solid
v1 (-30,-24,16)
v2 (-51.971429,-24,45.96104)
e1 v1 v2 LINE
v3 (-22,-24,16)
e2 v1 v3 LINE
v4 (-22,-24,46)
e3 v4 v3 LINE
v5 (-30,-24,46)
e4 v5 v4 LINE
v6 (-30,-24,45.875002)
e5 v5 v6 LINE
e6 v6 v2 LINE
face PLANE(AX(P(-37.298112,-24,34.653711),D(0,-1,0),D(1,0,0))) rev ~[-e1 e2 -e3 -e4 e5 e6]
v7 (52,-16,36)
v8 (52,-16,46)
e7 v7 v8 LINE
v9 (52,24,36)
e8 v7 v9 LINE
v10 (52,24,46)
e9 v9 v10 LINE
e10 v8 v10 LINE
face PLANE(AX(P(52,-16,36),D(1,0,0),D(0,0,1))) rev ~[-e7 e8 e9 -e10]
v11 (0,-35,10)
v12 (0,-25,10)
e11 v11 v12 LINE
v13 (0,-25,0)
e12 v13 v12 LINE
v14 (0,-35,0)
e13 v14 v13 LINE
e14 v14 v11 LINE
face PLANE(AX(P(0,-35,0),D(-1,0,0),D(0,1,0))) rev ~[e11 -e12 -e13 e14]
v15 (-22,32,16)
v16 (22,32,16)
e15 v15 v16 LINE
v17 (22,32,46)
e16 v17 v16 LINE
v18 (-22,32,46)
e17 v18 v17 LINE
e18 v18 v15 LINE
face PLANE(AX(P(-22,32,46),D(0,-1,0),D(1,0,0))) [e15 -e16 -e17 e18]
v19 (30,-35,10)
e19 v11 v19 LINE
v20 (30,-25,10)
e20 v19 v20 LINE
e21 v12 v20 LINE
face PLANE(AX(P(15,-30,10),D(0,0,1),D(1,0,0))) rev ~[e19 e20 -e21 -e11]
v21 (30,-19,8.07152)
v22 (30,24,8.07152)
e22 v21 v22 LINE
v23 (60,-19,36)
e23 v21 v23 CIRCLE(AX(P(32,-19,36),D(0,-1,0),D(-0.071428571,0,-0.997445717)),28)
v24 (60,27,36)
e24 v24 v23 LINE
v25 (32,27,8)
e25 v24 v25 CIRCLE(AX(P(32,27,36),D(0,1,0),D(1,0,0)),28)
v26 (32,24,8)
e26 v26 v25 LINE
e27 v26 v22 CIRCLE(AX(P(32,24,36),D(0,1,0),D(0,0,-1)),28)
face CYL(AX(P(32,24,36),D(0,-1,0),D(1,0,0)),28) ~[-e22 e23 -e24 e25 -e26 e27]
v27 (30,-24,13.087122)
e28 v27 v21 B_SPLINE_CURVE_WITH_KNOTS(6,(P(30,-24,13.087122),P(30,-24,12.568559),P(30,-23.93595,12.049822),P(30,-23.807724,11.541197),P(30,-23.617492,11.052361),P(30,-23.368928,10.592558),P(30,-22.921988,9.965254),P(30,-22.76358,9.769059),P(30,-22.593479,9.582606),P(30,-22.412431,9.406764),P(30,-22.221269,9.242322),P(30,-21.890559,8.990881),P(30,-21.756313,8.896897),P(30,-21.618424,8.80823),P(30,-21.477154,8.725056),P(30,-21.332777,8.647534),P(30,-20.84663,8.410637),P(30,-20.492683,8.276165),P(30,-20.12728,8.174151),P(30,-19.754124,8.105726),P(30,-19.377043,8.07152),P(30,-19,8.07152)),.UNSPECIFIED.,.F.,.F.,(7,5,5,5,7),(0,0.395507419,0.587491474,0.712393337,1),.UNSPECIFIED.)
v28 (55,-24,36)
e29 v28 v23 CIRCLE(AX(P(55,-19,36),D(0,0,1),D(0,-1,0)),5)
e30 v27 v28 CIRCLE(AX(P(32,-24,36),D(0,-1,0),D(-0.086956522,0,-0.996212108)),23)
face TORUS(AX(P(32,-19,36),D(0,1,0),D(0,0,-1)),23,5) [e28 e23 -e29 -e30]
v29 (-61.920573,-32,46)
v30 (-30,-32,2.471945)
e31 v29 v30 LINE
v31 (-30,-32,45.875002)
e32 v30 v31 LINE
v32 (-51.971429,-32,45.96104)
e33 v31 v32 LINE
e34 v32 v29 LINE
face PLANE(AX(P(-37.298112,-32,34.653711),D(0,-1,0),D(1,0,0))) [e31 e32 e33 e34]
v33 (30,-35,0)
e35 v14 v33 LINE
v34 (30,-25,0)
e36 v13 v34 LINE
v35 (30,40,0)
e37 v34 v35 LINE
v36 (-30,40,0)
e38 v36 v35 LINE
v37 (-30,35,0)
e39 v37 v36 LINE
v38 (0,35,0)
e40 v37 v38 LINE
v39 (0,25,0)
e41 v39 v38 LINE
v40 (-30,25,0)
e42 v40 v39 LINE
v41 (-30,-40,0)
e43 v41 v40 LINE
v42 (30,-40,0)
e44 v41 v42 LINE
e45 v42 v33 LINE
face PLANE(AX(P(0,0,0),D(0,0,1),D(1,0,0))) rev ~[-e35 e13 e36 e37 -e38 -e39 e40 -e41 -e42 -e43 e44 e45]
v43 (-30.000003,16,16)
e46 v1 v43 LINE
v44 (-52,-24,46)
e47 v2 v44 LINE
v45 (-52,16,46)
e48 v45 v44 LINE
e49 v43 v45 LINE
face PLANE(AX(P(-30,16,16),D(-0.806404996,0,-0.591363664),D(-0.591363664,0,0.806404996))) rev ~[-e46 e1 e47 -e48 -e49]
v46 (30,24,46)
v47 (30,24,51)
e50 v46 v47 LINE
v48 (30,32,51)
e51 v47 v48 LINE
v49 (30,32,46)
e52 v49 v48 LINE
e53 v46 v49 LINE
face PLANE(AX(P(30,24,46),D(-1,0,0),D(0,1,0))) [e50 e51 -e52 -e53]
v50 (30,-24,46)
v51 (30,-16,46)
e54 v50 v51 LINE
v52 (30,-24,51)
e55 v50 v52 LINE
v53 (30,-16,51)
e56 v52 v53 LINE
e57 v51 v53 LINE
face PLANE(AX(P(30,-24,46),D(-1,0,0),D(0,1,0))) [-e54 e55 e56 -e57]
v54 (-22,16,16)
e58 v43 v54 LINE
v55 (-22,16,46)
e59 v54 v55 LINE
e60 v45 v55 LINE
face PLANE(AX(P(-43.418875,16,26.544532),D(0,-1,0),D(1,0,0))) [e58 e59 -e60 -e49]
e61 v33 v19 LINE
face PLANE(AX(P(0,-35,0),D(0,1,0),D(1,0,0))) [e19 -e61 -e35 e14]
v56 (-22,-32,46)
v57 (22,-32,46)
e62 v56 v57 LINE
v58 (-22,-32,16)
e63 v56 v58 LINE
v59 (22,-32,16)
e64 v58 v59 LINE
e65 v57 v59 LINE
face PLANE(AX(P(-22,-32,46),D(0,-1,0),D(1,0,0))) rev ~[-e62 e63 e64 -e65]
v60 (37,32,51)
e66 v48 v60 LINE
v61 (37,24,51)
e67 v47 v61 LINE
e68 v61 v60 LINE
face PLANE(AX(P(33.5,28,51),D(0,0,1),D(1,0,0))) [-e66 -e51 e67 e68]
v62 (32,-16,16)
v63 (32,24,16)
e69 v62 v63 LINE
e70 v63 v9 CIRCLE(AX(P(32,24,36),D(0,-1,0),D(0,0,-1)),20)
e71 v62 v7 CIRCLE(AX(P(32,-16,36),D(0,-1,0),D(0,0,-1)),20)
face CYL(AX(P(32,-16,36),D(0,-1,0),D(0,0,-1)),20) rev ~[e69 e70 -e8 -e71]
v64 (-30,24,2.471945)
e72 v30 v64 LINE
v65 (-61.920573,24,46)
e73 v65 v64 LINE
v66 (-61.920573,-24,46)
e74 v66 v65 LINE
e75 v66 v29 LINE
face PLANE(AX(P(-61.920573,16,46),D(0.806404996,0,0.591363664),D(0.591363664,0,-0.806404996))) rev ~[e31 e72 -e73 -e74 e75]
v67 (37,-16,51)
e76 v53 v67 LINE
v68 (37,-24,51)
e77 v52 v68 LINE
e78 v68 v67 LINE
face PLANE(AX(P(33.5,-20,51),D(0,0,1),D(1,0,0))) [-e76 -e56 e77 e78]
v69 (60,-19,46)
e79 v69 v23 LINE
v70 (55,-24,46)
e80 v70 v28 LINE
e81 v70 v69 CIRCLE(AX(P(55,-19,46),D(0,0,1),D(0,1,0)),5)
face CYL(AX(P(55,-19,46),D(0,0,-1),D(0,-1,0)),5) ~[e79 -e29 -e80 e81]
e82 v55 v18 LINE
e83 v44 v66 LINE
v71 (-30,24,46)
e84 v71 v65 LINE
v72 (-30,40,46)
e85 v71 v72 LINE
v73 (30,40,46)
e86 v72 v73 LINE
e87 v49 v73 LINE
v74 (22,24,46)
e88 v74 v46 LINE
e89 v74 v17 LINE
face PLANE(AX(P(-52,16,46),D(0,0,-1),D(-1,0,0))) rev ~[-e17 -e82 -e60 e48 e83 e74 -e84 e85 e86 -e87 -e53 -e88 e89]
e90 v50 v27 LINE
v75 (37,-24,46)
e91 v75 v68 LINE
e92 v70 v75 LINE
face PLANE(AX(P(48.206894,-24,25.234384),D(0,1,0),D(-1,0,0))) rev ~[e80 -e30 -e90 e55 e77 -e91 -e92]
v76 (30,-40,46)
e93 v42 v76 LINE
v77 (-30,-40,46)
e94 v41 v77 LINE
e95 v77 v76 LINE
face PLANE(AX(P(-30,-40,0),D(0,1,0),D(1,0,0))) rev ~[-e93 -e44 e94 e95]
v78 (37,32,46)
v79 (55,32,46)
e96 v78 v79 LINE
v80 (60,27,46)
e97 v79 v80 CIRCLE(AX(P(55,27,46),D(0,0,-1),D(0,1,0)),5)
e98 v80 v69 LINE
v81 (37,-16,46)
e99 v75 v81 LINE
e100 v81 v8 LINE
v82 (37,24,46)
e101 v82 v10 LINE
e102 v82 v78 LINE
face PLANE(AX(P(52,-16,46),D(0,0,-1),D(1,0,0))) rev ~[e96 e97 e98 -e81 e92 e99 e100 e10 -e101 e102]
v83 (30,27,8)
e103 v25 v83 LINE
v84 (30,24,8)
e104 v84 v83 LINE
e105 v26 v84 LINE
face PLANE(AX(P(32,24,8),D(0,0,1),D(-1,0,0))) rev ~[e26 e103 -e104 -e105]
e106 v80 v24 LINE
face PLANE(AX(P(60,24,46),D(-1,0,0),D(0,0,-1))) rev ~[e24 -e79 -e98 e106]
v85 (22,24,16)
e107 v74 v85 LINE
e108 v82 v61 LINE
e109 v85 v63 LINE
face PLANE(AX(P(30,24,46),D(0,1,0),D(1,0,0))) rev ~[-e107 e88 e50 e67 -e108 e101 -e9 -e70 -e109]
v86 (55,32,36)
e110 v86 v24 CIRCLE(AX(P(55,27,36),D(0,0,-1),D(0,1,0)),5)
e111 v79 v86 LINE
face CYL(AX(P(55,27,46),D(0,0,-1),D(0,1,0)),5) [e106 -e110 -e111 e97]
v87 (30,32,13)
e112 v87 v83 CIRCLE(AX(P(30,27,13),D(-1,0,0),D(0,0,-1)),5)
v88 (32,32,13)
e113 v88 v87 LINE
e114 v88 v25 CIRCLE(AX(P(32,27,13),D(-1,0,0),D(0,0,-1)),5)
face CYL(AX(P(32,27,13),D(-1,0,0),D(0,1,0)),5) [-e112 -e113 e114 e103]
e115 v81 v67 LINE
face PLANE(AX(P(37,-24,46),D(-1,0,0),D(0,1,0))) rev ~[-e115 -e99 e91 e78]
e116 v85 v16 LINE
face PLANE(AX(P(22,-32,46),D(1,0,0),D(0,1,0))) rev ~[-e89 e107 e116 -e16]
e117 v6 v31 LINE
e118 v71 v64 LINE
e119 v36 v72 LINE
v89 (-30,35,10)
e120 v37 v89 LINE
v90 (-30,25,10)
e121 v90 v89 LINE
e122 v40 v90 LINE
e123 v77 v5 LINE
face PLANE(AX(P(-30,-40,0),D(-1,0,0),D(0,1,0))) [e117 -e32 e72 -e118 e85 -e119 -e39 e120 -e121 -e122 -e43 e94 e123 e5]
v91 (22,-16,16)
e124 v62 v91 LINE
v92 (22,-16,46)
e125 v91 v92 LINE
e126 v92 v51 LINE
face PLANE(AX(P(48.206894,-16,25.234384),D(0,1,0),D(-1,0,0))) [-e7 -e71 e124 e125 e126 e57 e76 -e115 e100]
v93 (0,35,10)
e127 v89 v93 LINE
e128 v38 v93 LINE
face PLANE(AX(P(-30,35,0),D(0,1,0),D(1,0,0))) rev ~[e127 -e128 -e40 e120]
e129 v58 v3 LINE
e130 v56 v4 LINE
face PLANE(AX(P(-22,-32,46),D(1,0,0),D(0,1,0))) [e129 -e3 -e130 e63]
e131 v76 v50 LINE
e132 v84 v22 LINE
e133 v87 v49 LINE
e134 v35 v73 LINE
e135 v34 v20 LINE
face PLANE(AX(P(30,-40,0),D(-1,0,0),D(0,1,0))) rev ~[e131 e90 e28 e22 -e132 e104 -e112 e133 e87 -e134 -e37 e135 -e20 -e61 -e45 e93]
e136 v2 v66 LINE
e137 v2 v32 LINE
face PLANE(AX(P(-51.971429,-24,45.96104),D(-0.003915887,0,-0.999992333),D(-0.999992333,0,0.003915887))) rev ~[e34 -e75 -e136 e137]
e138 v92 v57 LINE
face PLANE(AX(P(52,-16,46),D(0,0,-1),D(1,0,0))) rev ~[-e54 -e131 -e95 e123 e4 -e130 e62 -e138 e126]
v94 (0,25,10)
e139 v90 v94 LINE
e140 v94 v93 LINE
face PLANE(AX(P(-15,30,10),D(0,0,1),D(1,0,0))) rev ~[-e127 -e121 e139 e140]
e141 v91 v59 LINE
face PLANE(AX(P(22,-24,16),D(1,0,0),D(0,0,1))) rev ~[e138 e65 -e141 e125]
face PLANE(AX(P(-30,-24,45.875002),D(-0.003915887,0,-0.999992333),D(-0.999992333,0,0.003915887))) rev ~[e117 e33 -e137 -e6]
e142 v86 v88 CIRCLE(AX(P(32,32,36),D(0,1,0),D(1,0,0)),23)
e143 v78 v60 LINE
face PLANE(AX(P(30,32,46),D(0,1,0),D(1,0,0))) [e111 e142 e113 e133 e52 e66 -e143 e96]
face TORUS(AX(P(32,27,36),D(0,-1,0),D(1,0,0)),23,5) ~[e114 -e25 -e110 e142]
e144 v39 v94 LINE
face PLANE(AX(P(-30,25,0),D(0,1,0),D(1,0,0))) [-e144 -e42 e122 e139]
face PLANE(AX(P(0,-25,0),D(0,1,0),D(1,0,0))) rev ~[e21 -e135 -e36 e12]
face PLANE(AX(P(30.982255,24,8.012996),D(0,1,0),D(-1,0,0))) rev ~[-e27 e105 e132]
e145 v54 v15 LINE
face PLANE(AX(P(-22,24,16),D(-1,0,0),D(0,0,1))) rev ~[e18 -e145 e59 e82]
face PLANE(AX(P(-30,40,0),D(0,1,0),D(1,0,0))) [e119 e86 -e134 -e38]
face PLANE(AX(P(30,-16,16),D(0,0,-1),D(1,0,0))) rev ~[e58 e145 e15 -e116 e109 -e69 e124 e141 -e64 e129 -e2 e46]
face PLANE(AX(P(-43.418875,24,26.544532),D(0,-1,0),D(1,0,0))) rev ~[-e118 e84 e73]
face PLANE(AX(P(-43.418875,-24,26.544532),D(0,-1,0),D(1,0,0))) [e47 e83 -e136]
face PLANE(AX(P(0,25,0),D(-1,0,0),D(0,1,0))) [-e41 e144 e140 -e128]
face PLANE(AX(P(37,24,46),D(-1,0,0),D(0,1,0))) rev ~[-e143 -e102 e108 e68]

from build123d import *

# Parameters (mm, degrees)
F0_W      = 60
F0_H      = 80
F2_DEPTH  = 46
F1_W      = 30
F1_H      = 10
F3_DEPTH  = 10
F4_W      = 44
F4_H      = 64
F5_DEPTH  = 30
F6_W      = 8
F6_H      = 48
F7_DEPTH  = 30
F8_W      = 22
F8_H      = 30
F8_W_2    = 8
F9_DEPTH  = 8
F10_R     = 20
F12_DEPTH = 8
F14_DEPTH = 40
F15_R     = 5
F17_DEPTH = 8
F18_R     = 5
F19_W     = 7
F19_H     = 8
F20_DEPTH = 5
F21_W     = 22
F21_H     = 30
F21_W_2   = 8
F22_DEPTH = 8
F23_SIZE2 = 29.99999
F23_SIZE  = 21.99999
F25_DEPTH = 8
F27_DEPTH = 40
F29_DEPTH = 8


# Not quite as in the source:
# - a fillet or chamfer is up to 0.001 mm smaller than in the source, because OpenCascade refuses the exact size


with BuildPart() as f2:
    # F0 (on Top) → F2 (new body)
    with BuildSketch(Plane.XY):
        Rectangle(F0_W, F0_H)
    extrude(amount=F2_DEPTH)

    # F1 (on face) → F3 (cut)
    with BuildSketch(Plane.XY):
        with Locations((-15, 30)):
            Rectangle(F1_W, F1_H)
        with Locations((15, -30)):
            Rectangle(F1_W, F1_H)
    extrude(amount=F3_DEPTH, mode=Mode.SUBTRACT)

    # F4 (on face) → F5 (cut)
    with BuildSketch(Plane.XY.offset(46)):
        Rectangle(F4_W, F4_H)
    extrude(amount=-F5_DEPTH, mode=Mode.SUBTRACT)

    # F6 (on face) → F7 (cut, through all)
    with BuildSketch(Plane.XY.offset(46)):
        with Locations((-26, 0)):
            Rectangle(F6_W, F6_H)
        with Locations((26, 0)):
            Rectangle(F6_W, F6_H)
    extrude(amount=-F7_DEPTH, mode=Mode.SUBTRACT)

    # F8 (on face) → F9 (join)
    with BuildSketch(Plane(origin=(0, -24, 0), x_dir=(-1, 0, 0), z_dir=(0, 1, 0))):
        with Locations((-41, 31)):
            Rectangle(F8_W, F8_H)
        with Locations((-26, 31)):
            Rectangle(F8_W_2, F8_H)
    extrude(amount=F9_DEPTH)

    # F10
    f10_edges = [f2.edges().sort_by_distance(p)[0] for p in [
        (52, -20, 16),
    ]]
    fillet(f10_edges, radius=F10_R)

    # F11 (on face) → F12 (join, through all)
    with BuildSketch(Plane(origin=(0, -16, 0), x_dir=(-1, 0, 0), z_dir=(0, 1, 0))):
        with BuildLine():
            ThreePointArc((-58.1533936612, 46), (-59.5344785906, 41.08453427), (-60, 36))
            ThreePointArc((-60, 36), (-51.7989898732, 16.2010101268), (-32, 8))
            Line((-32, 8), (-32, 16))
            ThreePointArc((-32, 16), (-46.1421356237, 21.8578643763), (-52, 36))
            Line((-52, 36), (-52, 46))
            Line((-52, 46), (-58.1533936612, 46))
        make_face()
        with BuildLine():
            Line((-60, 46), (-60, 36))
            ThreePointArc((-60, 36), (-59.5344785906, 41.08453427), (-58.1533936612, 46))
            Line((-58.1533936612, 46), (-60, 46))
        make_face()
        with BuildLine():
            Line((-32, 16), (-32, 8))
            ThreePointArc((-32, 8), (-30.999360817, 8.0178856906), (-30, 8.0715199125))
            Line((-30, 8.0715199125), (-30, 16))
            Line((-30, 16), (-32, 16))
        make_face()
    extrude(amount=-F12_DEPTH)

    # F13 (on face) → F14 (join, through all)
    with BuildSketch(Plane(origin=(0, -16, 0), x_dir=(-1, 0, 0), z_dir=(0, 1, 0))):
        with BuildLine():
            ThreePointArc((-58.1533936612, 46), (-59.5344785906, 41.08453427), (-60, 36))
            Line((-60, 36), (-52, 36))
            Line((-52, 36), (-52, 46))
            Line((-52, 46), (-58.1533936612, 46))
        make_face()
        with BuildLine():
            Line((-60, 46), (-60, 36))
            ThreePointArc((-60, 36), (-59.5344785906, 41.08453427), (-58.1533936612, 46))
            Line((-58.1533936612, 46), (-60, 46))
        make_face()
        with BuildLine():
            Line((-52, 36), (-60, 36))
            ThreePointArc((-60, 36), (-51.7989898732, 16.2010101268), (-32, 8))
            Line((-32, 8), (-32, 16))
            ThreePointArc((-32, 16), (-46.1421356237, 21.8578643763), (-52, 36))
        make_face()
        with BuildLine():
            Line((-32, 16), (-32, 8))
            ThreePointArc((-32, 8), (-30.999360817, 8.0178856906), (-30, 8.0715199125))
            Line((-30, 8.0715199125), (-30, 16))
            Line((-30, 16), (-32, 16))
        make_face()
    extrude(amount=F14_DEPTH)

    # F15
    f15_edges = [f2.edges().sort_by_distance(p)[0] for p in [
        (51.078784, -24, 15.506098),
    ]]
    fillet(f15_edges, radius=F15_R)

    # F16 (on face) → F17 (join)
    with BuildSketch(Plane(origin=(0, 24, 0), x_dir=(-1, 0, 0), z_dir=(0, 1, 0))):
        with BuildLine():
            ThreePointArc((-30, 8.0715199125), (-30.999360817, 8.0178856906), (-32, 8))
            Line((-32, 8), (-30, 8))
            Line((-30, 8), (-30, 8.0715199125))
        make_face()
        with BuildLine():
            Line((-30, 16), (-32, 16))
            Line((-32, 16), (-32, 8))
            ThreePointArc((-32, 8), (-30.999360817, 8.0178856906), (-30, 8.0715199125))
            Line((-30, 8.0715199125), (-30, 16))
        make_face()
        with BuildLine():
            ThreePointArc((-32, 16), (-46.1421356237, 21.8578643763), (-52, 36))
            Line((-52, 36), (-60, 36))
            ThreePointArc((-60, 36), (-51.7989898732, 16.2010101268), (-32, 8))
            Line((-32, 8), (-32, 16))
        make_face()
        with BuildLine():
            Line((-60, 46), (-60, 36))
            ThreePointArc((-60, 36), (-59.5344785906, 41.08453427), (-58.1533936612, 46))
            Line((-58.1533936612, 46), (-60, 46))
        make_face()
        with BuildLine():
            Line((-60, 36), (-52, 36))
            Line((-52, 36), (-52, 46))
            Line((-52, 46), (-58.1533936612, 46))
            ThreePointArc((-58.1533936612, 46), (-59.5344785906, 41.08453427), (-60, 36))
        make_face()
        with BuildLine():
            ThreePointArc((-30, 16.1002512579), (-30.9987444988, 16.0250785378), (-32, 16))
            Line((-32, 16), (-30, 16))
            Line((-30, 16), (-30, 16.1002512579))
        make_face()
        with BuildLine():
            ThreePointArc((-49.3205080757, 46), (-51.3185165258, 41.1763809021), (-52, 36))
            ThreePointArc((-52, 36), (-46.1421356237, 21.8578643763), (-32, 16))
            ThreePointArc((-32, 16), (-30.9987444988, 16.0250785378), (-30, 16.1002512579))
            Line((-30, 16.1002512579), (-30, 46))
            Line((-30, 46), (-49.3205080757, 46))
        make_face()
        with BuildLine():
            Line((-52, 46), (-52, 36))
            ThreePointArc((-52, 36), (-51.3185165258, 41.1763809021), (-49.3205080757, 46))
            Line((-49.3205080757, 46), (-52, 46))
        make_face()
    extrude(amount=F17_DEPTH)

    # F18
    f18_edges = [f2.edges().sort_by_distance(p)[0] for p in [
        (51.79899, 32, 16.20101),
    ]]
    fillet(f18_edges, radius=F18_R)

    # F19 (on face) → F20 (join)
    with BuildSketch(Plane.XY.offset(46)):
        with Locations((33.5, 28)):
            Rectangle(F19_W, F19_H)
        with Locations((33.5, -20)):
            Rectangle(F19_W, F19_H)
    extrude(amount=F20_DEPTH)

    # F21 (on face) → F22 (join)
    with BuildSketch(Plane.XZ.offset(-24)):
        with Locations((-41, 31)):
            Rectangle(F21_W, F21_H)
        with Locations((-26, 31)):
            Rectangle(F21_W_2, F21_H)
    extrude(amount=F22_DEPTH)

    # F23 (size 22 and 30 in the source; OpenCascade refuses exactly that, so slightly less here)
    f23_edges = [f2.edges().sort_by_distance(p)[0] for p in [
        (-52, 20, 16),
    ]]
    f23_side = f2.faces().sort_by_distance((-41, 20, 16))[0]
    chamfer(f23_edges, length=F23_SIZE, length2=F23_SIZE2, reference=f23_side)

    # F24 (on face) → F25 (join)
    with BuildSketch(Plane.XZ.offset(-16)):
        Polygon((-30, 16), (-52, 46), (-61.9205734601, 46), (-30, 2.4719452816), align=None)
    extrude(amount=-F25_DEPTH)

    # F26 (on face) → F27 (join, through all)
    with BuildSketch(Plane.XZ.offset(-16)):
        Polygon((-61.9205734601, 46), (-30, 2.4719452816), (-30, 16), (-52, 46), align=None)
    extrude(amount=F27_DEPTH)

    # F28 (on face) → F29 (join)
    with BuildSketch(Plane.XZ.offset(24)):
        Polygon((-51.9714293201, 45.961039982), (-30, 16), (-30, 45.8750016987), align=None)
        Polygon((-61.9205734601, 46), (-30, 2.4719452816), (-30, 16), (-51.9714293201, 45.961039982), align=None)
    extrude(amount=F29_DEPTH)


solid = f2.part
